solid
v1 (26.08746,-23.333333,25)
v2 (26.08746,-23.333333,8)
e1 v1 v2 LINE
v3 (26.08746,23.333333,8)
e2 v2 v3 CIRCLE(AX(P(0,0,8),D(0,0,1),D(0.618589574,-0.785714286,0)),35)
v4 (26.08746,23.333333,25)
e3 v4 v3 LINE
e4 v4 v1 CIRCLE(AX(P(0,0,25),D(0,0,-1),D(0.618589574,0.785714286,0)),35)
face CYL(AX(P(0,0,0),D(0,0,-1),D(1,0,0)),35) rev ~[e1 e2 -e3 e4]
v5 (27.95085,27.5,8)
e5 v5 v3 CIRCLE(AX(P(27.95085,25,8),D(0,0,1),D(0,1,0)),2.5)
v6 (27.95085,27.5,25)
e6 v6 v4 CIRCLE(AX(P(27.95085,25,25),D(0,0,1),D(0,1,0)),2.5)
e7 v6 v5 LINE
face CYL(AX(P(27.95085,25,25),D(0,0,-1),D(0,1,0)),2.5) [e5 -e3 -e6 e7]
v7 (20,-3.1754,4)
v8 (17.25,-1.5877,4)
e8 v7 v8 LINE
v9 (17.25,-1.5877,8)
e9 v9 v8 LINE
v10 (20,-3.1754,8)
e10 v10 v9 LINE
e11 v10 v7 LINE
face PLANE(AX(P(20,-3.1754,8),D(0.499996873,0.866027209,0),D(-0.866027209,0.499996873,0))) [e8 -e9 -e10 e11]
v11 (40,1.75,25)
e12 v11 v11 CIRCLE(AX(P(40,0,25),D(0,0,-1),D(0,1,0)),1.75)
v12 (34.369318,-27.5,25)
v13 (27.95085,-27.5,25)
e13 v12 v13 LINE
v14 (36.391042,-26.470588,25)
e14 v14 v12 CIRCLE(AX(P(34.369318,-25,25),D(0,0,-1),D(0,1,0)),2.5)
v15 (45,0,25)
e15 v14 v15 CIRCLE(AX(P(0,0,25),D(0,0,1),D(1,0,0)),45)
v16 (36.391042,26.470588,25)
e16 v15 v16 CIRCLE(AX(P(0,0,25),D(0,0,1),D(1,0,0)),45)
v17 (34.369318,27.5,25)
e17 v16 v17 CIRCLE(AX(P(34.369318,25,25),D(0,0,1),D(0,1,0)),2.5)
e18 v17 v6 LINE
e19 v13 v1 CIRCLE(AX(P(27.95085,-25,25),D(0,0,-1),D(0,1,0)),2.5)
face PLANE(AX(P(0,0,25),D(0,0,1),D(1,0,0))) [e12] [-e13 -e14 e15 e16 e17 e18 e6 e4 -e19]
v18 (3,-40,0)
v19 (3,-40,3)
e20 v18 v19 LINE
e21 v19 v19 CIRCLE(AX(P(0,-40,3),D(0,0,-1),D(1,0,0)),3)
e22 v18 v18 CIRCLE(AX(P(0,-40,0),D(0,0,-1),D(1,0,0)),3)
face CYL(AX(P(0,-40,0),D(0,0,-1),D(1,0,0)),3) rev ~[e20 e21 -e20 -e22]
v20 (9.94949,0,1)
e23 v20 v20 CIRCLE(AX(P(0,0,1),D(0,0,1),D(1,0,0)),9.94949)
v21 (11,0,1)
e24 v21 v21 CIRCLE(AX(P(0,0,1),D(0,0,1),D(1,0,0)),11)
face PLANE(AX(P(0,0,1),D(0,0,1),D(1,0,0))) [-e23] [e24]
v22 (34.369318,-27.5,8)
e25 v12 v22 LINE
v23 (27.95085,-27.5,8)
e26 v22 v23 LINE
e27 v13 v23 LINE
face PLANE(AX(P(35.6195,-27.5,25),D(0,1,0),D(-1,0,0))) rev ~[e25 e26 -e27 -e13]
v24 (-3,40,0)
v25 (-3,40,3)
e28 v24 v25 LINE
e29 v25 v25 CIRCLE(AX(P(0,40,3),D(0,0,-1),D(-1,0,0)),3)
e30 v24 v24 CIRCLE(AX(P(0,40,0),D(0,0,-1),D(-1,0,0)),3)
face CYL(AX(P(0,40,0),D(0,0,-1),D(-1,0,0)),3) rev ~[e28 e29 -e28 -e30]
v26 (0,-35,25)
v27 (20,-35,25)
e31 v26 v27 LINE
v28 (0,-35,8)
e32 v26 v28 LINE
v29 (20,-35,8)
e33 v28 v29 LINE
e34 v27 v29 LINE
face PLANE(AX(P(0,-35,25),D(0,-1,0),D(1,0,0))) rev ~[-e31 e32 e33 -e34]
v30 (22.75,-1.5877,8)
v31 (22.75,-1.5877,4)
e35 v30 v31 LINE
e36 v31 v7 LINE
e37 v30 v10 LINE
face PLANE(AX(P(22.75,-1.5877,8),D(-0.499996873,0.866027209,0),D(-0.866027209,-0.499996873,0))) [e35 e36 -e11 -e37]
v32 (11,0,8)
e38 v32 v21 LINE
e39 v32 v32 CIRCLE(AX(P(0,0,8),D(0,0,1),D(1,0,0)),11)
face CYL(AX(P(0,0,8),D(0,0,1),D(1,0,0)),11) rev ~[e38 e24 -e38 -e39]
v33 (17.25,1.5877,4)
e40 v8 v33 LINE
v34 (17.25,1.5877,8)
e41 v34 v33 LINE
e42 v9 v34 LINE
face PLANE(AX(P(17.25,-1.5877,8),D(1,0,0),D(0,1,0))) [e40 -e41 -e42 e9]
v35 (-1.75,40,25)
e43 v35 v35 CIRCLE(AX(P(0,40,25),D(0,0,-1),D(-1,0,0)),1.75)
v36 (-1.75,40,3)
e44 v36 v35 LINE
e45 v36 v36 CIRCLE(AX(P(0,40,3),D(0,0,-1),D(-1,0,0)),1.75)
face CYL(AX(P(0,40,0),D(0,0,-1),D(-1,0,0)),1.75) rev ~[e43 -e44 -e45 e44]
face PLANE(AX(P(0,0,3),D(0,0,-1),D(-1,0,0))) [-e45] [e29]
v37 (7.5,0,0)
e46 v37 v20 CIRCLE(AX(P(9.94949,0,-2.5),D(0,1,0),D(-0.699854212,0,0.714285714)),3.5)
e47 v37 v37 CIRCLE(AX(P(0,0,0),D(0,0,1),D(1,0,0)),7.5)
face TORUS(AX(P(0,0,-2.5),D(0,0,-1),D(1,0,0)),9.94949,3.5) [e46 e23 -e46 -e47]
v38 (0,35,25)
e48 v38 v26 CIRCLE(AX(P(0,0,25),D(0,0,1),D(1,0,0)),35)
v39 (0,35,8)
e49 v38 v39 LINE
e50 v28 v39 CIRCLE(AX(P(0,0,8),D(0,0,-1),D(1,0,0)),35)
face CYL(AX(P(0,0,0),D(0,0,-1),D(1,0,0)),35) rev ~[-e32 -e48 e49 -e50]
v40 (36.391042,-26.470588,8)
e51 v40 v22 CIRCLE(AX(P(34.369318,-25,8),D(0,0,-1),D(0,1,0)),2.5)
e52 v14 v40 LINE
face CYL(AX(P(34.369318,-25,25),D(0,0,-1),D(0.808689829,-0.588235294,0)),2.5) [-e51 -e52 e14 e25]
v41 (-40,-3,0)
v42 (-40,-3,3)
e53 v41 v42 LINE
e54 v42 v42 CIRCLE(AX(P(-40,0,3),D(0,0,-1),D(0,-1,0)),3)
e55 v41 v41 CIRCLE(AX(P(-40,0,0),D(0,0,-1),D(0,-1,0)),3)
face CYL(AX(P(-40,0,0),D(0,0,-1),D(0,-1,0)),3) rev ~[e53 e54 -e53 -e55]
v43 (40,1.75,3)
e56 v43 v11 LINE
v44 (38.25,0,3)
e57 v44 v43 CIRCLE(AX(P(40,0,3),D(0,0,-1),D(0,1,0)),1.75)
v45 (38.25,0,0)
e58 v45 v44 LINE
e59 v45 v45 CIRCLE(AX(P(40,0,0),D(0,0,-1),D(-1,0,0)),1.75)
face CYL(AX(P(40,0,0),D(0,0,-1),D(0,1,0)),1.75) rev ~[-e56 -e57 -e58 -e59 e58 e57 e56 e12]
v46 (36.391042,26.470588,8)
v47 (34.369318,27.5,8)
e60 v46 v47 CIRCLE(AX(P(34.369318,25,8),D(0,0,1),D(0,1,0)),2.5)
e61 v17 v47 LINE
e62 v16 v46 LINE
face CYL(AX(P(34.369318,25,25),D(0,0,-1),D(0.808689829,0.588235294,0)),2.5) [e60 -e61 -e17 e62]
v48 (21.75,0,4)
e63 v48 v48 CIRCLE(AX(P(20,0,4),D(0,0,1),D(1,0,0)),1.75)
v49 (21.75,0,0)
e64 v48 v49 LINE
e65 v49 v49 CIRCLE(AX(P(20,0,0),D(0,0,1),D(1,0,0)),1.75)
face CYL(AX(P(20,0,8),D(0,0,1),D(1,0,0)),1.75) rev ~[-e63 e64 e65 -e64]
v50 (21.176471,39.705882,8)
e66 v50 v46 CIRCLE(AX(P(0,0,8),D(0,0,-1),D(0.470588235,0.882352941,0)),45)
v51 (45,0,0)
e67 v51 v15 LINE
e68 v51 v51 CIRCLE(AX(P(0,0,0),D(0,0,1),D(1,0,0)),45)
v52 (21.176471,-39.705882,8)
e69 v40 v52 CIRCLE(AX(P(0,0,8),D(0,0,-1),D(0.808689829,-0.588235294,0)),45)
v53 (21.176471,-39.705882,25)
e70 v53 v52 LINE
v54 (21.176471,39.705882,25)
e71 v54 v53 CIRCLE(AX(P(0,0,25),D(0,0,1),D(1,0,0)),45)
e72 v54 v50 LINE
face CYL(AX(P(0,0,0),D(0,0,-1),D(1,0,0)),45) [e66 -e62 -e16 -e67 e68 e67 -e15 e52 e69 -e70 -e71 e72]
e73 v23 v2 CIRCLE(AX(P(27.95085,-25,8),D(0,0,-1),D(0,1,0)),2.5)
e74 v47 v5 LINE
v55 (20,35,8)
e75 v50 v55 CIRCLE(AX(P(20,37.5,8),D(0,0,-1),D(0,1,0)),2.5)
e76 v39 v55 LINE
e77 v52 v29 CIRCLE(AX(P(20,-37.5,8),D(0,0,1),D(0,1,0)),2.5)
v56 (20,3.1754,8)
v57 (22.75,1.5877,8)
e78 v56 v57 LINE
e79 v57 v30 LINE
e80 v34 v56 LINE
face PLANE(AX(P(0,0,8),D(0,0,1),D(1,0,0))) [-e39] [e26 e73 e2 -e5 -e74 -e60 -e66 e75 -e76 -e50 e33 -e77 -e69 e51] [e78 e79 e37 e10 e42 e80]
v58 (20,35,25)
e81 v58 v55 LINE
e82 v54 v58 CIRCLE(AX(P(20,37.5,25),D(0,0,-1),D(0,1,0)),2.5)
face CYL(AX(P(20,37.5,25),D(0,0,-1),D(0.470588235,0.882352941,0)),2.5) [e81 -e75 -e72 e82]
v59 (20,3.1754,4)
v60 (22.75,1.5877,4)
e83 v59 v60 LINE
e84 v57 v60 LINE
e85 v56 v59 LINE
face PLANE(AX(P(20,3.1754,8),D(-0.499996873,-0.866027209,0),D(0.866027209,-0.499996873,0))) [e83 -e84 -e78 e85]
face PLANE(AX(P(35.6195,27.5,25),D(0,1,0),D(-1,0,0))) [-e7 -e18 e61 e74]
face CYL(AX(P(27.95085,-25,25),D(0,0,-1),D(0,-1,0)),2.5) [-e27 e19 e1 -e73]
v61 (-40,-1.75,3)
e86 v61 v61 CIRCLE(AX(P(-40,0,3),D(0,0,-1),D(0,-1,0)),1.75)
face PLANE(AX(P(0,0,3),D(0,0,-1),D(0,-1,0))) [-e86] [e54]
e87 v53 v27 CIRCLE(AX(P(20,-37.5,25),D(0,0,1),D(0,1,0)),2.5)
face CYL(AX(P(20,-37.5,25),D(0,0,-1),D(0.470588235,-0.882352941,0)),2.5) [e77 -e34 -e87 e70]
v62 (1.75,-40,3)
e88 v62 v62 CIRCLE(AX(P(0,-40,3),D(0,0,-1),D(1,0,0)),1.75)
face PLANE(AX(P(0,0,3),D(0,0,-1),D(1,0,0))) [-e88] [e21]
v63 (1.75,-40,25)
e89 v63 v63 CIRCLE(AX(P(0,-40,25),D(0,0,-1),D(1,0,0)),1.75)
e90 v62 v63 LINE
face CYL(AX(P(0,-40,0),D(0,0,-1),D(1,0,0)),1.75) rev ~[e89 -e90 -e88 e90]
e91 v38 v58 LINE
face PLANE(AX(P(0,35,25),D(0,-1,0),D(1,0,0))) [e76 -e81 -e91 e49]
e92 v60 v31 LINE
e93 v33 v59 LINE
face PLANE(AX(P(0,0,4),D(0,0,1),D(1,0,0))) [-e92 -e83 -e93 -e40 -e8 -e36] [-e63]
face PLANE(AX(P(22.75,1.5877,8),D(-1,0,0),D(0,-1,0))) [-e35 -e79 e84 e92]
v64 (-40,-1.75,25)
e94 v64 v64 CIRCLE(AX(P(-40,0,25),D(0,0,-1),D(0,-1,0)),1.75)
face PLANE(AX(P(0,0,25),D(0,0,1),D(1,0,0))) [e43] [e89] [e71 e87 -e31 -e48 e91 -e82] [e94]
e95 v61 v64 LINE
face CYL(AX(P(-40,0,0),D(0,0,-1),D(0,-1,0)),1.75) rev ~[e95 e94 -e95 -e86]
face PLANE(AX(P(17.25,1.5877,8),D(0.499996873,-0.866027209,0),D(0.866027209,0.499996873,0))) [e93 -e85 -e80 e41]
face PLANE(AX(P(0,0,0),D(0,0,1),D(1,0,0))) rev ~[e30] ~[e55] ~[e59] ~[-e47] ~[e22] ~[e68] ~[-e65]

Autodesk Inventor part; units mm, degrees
ref_plane "YZ Plane" through (0, 0, 0) normal (1, 0, 0) x (0, 1, 0)
ref_plane "XZ Plane" through (0, 0, 0) normal (0, 1, 0) x (-1, 0, 0)
ref_plane "XY Plane" through (0, 0, 0) normal (0, 0, 1) x (1, 0, 0)
sketch "Sketch1" plane through (0, 0, 0) normal (0, 0, 1) x (1, 0, 0)
  circle A0 centre (0, 0) radius 45
  circle A1 centre (0, 0) radius 35
  dimension "d0" = 90
  dimension "d2" = 70
extrude "Extrusion1" add sketch "Sketch1" along normal blind 25
sketch "Sketch2" plane through (0, 0, 0) normal (0, 0, -1) x (-1, 0, 0)
  circle A0 centre (0, 0) radius 35 projected
extrude "Extrusion2" add sketch "Sketch2" against normal blind 8
sketch "Sketch3" plane through (0, 0, 8) normal (0, 0, 1) x (1, 0, 0)
  circle A0 centre (0, 0) radius 35 projected
  circle A1 centre (0, 0) radius 7.5
  dimension "d7" = 15
extrude "Extrusion3" cut sketch "Sketch3" against normal through all contours A1
sketch "Sketch4" plane through (0, 0, 8) normal (0, 0, 1) x (1, 0, 0)
  circle A0 centre (0, 0) radius 7.5 projected
  circle A1 centre (0, 0) radius 35 projected
  circle A2 centre (0, 0) radius 11
  dimension "d11" = 22
extrude "Extrusion4" cut sketch "Sketch4" against normal blind 7 contours A2
sketch "Sketch5" plane through (0, 0, 25) normal (0, 0, 1) x (1, 0, 0)
  circle A0 centre (0, 0) radius 35 construction
  circle A1 centre (0, 0) radius 45 construction
  circle A2 centre (0, 0) radius 32.5 construction
  line L0 (0, 35) -> (35.6195, 35)
  line L1 (35.6195, 35) -> (35.6195, 27.5)
  line L2 (35.6195, 27.5) -> (0, 27.5)
  line L3 (0, 27.5) -> (0, 35)
  line L4 (0, -35) -> (35.6195, -35)
  line L5 (35.6195, -35) -> (35.6195, -27.5)
  line L6 (35.6195, -27.5) -> (0, -27.5)
  line L7 (0, -27.5) -> (0, -35)
  dimension "d15" = 65
  dimension "d17" = 7.5
extrude "Extrusion5" cut sketch "Sketch5" against normal up to surface (17 mm away)
fillet "Fillet1" radius 2.5 6 edges at (28.2843, -35, 16.5) (35.6195, -27.5, 16.5) (21.6506, -27.5, 16.5) (21.6506, 27.5, 16.5) (35.6195, 27.5, 16.5) (28.2843, 35, 16.5)
sketch "Sketch6" plane through (0, 0, 0) normal (0, 0, -1) x (-1, 0, 0)
  circle A0 centre (0, 0) radius 7.5 projected
  circle A1 centre (0, 0) radius 45 projected
  circle A2 centre (0, 40) radius 1.75
  dimension "d21" = 40
  dimension "d22" = 3.5
extrude "Extrusion6" cut sketch "Sketch6" against normal through all contours A2
sketch "Sketch7" plane through (0, 0, 0) normal (0, 0, -1) x (-1, 0, 0)
  circle A0 centre (0, 40) radius 1.75 projected
  circle A1 centre (0, 40) radius 3
  dimension "d25" = 6
extrude "Extrusion7" cut sketch "Sketch7" against normal blind 3
pattern_circular "Circular Pattern1" count 4 over 360 about axis through (0, 0, 8) along (0, 0, -1) of "Extrusion7", "Extrusion6"
sketch "Sketch8" plane through (0, 0, 8) normal (0, 0, 1) x (1, 0, 0)
  arc A0 (0, 35) -> (0, -35) centre (0, 0) ccw projected
  circle A1 centre (20, 0) radius 1.75
  dimension "d32" = 20
  dimension "d34" = 3.5
extrude "Extrusion8" cut sketch "Sketch8" against normal through all
sketch "Sketch9" plane through (0, 0, 8) normal (0, 0, 1) x (1, 0, 0)
  circle A0 centre (20, 0) radius 1.75 projected
  line L0 (20, 3.1754) -> (22.75, 1.5877)
  line L1 (22.75, 1.5877) -> (22.75, -1.5877)
  line L2 (22.75, -1.5877) -> (20, -3.1754)
  line L3 (20, -3.1754) -> (17.25, -1.5877)
  line L4 (17.25, -1.5877) -> (17.25, 1.5877)
  line L5 (17.25, 1.5877) -> (20, 3.1754)
  dimension "d37" = 5.5
extrude "Extrusion9" cut sketch "Sketch9" against normal blind 4
sketch "Sketch10" plane through (0, 0, 0) normal (0, 0, -1) x (-1, 0, 0)
  circle A0 centre (-40, 0) radius 3 projected
  circle A1 centre (-40, 0) radius 1.75 projected
extrude "Extrusion10" add sketch "Sketch10" against normal up to next
fillet "Fillet2" radius 3.5 1 edges at (-7.5, 0, 1)
properties part number "offset shield"
